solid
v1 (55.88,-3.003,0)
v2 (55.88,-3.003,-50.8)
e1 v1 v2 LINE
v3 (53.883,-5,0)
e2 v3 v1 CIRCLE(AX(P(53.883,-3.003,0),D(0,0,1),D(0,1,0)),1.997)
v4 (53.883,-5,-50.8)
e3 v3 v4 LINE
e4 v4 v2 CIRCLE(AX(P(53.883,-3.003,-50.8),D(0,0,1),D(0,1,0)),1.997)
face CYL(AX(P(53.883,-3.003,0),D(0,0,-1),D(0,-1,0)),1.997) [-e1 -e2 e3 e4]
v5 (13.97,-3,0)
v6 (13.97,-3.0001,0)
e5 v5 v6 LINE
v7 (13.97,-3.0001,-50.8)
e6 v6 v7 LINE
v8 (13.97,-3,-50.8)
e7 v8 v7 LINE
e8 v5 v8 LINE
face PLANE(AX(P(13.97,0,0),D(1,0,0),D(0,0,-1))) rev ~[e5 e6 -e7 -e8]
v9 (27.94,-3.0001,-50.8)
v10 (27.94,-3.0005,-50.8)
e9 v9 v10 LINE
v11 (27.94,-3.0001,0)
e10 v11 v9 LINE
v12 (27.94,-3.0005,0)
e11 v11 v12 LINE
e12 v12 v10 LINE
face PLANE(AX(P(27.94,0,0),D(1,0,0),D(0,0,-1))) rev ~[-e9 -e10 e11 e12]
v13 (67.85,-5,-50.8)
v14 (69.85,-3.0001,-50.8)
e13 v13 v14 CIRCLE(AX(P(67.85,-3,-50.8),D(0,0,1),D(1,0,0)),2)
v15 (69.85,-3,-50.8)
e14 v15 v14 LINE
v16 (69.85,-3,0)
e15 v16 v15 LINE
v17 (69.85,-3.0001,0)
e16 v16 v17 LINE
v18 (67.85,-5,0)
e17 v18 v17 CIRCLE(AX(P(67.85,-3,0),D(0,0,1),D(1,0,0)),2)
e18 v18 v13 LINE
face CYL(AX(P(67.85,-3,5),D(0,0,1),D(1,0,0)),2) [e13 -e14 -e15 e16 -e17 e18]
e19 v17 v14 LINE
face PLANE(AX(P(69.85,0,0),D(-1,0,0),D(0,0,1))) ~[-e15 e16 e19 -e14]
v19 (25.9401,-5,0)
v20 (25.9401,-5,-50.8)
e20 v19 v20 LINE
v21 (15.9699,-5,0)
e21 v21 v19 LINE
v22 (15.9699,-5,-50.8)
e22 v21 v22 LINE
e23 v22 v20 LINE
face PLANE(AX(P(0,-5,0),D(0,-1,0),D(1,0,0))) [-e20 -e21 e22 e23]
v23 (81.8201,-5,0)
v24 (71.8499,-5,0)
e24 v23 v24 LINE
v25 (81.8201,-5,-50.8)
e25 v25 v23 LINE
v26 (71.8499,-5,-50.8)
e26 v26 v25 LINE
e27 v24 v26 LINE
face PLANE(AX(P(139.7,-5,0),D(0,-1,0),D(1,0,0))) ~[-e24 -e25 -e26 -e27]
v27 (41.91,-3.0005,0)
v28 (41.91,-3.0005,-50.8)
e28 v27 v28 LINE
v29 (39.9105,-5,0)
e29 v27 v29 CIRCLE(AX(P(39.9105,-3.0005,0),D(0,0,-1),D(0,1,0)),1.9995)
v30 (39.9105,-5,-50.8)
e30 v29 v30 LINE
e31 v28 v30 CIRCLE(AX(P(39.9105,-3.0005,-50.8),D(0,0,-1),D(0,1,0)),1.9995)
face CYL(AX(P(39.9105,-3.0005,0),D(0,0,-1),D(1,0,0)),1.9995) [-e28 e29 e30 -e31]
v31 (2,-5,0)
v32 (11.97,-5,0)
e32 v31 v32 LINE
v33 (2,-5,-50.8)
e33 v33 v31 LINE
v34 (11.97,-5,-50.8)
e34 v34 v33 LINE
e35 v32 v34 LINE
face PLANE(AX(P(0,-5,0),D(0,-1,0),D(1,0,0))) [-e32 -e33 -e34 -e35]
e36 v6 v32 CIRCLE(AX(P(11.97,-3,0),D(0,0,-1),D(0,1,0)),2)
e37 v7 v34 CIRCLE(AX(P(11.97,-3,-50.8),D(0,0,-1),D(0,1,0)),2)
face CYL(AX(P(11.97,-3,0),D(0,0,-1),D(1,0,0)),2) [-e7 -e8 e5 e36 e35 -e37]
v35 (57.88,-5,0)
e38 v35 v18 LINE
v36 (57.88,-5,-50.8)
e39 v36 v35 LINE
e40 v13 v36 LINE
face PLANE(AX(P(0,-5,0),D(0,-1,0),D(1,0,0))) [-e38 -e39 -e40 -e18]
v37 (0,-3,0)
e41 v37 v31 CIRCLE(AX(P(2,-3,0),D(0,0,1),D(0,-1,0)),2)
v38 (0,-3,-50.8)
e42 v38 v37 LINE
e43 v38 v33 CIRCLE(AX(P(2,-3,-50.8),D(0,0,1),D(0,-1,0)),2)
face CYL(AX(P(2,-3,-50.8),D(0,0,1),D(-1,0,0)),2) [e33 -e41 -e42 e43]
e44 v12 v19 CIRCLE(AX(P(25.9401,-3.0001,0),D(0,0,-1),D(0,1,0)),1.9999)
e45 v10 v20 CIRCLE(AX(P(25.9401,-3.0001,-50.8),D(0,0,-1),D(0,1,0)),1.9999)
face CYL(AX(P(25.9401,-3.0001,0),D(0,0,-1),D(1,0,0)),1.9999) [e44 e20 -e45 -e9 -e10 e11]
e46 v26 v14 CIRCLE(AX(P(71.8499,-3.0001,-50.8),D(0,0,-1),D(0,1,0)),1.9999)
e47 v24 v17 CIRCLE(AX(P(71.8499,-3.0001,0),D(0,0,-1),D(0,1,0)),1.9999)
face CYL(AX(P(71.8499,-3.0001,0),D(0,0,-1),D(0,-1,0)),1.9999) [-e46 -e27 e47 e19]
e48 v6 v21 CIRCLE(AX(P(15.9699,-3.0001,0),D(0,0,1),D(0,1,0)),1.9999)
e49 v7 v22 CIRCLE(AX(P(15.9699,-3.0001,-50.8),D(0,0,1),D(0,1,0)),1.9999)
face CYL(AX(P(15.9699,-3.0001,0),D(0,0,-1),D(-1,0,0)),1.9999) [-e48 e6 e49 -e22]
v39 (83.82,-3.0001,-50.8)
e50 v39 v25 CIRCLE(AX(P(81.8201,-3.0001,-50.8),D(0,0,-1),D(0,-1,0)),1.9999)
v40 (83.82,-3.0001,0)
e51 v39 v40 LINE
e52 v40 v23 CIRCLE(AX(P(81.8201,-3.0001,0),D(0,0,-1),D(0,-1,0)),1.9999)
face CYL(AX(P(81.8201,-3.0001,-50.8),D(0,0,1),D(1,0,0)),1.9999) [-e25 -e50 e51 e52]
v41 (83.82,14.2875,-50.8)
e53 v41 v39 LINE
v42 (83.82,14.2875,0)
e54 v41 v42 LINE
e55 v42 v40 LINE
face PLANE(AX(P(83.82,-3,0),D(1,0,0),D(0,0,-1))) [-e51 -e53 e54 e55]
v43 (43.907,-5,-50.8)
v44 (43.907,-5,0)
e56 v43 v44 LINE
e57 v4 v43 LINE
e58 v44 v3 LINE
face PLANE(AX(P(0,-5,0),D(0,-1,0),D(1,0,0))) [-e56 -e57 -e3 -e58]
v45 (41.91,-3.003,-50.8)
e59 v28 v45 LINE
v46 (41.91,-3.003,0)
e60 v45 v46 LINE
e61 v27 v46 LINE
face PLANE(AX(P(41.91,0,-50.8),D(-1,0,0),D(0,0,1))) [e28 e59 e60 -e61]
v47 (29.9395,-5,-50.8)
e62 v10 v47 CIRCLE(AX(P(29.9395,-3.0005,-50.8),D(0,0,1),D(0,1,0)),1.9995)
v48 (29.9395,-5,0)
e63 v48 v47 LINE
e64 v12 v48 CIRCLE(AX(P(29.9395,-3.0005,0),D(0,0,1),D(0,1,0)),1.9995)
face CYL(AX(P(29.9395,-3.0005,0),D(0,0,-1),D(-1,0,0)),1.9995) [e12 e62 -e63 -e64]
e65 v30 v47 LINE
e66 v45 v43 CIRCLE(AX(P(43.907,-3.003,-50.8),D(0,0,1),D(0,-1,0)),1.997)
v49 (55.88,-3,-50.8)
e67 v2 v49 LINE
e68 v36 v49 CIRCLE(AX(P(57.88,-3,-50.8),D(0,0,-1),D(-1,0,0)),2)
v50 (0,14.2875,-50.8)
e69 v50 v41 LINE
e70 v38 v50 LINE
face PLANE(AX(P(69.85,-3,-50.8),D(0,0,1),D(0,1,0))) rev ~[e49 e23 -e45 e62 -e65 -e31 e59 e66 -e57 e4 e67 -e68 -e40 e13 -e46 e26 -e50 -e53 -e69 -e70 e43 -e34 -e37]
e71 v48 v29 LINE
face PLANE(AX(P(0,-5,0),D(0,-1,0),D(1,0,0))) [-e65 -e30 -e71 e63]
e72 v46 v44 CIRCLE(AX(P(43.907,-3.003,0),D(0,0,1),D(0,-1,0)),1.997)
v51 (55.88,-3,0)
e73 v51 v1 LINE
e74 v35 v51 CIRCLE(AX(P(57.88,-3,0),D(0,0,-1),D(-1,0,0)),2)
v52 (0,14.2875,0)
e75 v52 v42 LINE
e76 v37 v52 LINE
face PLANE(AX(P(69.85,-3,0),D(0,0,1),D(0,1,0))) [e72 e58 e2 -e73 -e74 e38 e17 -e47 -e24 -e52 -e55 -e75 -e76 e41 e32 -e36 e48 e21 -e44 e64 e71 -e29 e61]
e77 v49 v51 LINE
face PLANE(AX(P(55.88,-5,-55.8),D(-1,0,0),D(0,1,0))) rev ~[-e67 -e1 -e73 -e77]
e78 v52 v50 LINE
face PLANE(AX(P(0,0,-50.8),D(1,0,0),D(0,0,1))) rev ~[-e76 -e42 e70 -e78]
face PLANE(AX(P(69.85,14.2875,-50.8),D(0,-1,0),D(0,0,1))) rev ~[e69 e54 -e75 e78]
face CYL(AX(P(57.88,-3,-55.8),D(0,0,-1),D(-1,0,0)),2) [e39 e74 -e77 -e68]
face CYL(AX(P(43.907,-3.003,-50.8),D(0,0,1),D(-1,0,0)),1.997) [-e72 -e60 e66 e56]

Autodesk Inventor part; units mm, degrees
ref_plane "YZ Plane" through (0, 0, 0) normal (1, 0, 0) x (0, 1, 0)
ref_plane "XZ Plane" through (0, 0, 0) normal (0, 1, 0) x (-1, 0, 0)
ref_plane "XY Plane" through (0, 0, 0) normal (0, 0, 1) x (1, 0, 0)
sketch "Sketch1" plane through (0, 0, 0) normal (0, 1, 0) x (-1, 0, 0)
  line L0 (0, 0) -> (-69.85, 0)
  line L1 (-69.85, 0) -> (-69.85, -50.8)
  line L2 (-69.85, -50.8) -> (0, -50.8)
  line L3 (0, -50.8) -> (0, 0)
  dimension "d0" = 50.8
  dimension "d1" = 69.85
extrude "Extrusion1" add sketch "Sketch1" along normal blind 28.575
sketch "Sketch2" plane through (0, 28.575, 0) normal (0, 1, 0) x (1, 0, 0)
  line L0 (0, 0) -> (69.85, 0) projected
  line L1 (13.97, 0) -> (13.97, 50.8)
  line L2 (69.85, 50.8) -> (0, 50.8) projected
  line L3 (27.94, 50.8) -> (27.94, 0)
  line L4 (55.88, 50.8) -> (55.88, 0)
  line L5 (41.91, 50.8) -> (41.91, 0)
  line L6 (0, 50.8) -> (0, 0) projected
  dimension "d4" = 13.97
  dimension "d5" = 13.97
  dimension "d6" = 13.97
  dimension "d7" = 13.97
sketch "Sketch3" plane through (0, 28.575, 0) normal (0, 1, 0) x (1, 0, 0)
  line L0 (69.85, 50.8) -> (0, 50.8) projected
  line L1 (0, 0) -> (69.85, 0) projected
  line L2 (0, 50.8) -> (13.97, 50.8)
  line L3 (13.97, 50.8) -> (13.97, 0)
  line L4 (13.97, 0) -> (0, 0)
  line L5 (0, 0) -> (0, 50.8)
  dimension "d8" = 50.8
  dimension "d9" = 13.97
extrude "Extrusion2" add sketch "Sketch2" along normal blind 5 contours L6 L2 L1 L0
sketch "Sketch4" plane through (0, 0, -50.8) normal (-1, 0, 0) x (0, 0, 1)
  line L0 (0, 0) -> (0, 33.575) projected
  line L1 (50.8, 0) -> (50.8, 33.575) projected
  line L2 (0, 33.575) -> (50.8, 33.575)
  line L3 (50.8, 33.575) -> (50.8, 28.5663)
  line L4 (50.8, 28.5663) -> (0, 28.5663)
  line L5 (0, 28.5663) -> (0, 33.575)
fillet "Fillet1" radius 2 2 edges at (0, 33.575, -25.4) (13.97, 33.575, -25.4)
sketch "Sketch5" plane through (0, 28.575, 0) normal (0, 1, 0) x (1, 0, 0)
  line L0 (13.97, 50.8) -> (27.94, 50.8)
  line L1 (27.94, 50.8) -> (27.94, 0)
  line L2 (27.94, 0) -> (13.97, 0)
  line L3 (13.97, 0) -> (13.97, 50.8)
  point P0 (0, 0)
  dimension "d13" = 13.97
extrude "Extrusion3" add sketch "Sketch5" along normal blind 5
fillet "Fillet2" radius 2 2 edges at (13.97, 33.575, -25.4) (27.94, 33.575, -25.4)
sketch "Sketch6" plane through (0, 28.575, 0) normal (0, 1, 0) x (1, 0, 0)
  line L0 (27.94, 50.8) -> (27.94, 0) projected
  line L1 (27.94, 50.8) -> (41.91, 50.8)
  line L2 (41.91, 50.8) -> (41.91, 0)
  line L3 (41.91, 0) -> (27.94, 0)
  line L4 (27.94, 0) -> (27.94, 50.8)
  point P0 (0, 0)
  dimension "d17" = 13.97
extrude "Extrusion4" add sketch "Sketch6" along normal blind 5
fillet "Fillet3" radius 2 2 edges at (27.94, 33.575, -25.4) (41.91, 33.575, -25.4)
sketch "Sketch7" plane through (0, 28.575, 0) normal (0, 1, 0) x (1, 0, 0)
  line L0 (41.91, 0) -> (41.91, 50.8) projected
  line L1 (41.91, 0) -> (69.85, 0) projected
  line L2 (41.91, 50.8) -> (55.88, 50.8)
  line L3 (55.88, 50.8) -> (55.88, 0)
  line L4 (55.88, 0) -> (41.91, 0)
  line L5 (41.91, 0) -> (41.91, 50.8)
  point P0 (0, 0)
extrude "Extrusion5" add sketch "Sketch7" along normal blind 5
fillet "Fillet4" radius 2 2 edges at (41.91, 33.575, -25.4) (55.88, 33.575, -25.4)
sketch "Sketch8" plane through (0, 28.575, 0) normal (0, 1, 0) x (1, 0, 0)
  line L0 (55.88, 50.8) -> (55.88, 0) projected
  line L1 (55.88, 0) -> (69.85, 0) projected
  line L2 (55.88, 50.8) -> (69.85, 50.8)
  line L3 (69.85, 50.8) -> (69.85, 0)
  line L4 (69.85, 0) -> (55.88, 0)
  line L5 (55.88, 0) -> (55.88, 50.8)
  point P0 (0, 0)
extrude "Extrusion6" add sketch "Sketch8" along normal blind 5
fillet "Fillet5" radius 2 2 edges at (55.88, 33.575, -25.4) (69.85, 33.575, -25.4)
sketch "Sketch9" plane through (0, 0, 0) normal (0, -1, 0) x (1, 0, 0)
  point P0 (0, 0)
sketch "Sketch10" plane through (0, 0, 0) normal (0, -1, 0) x (1, 0, 0)
  line L0 (69.85, -50.8) -> (0, -50.8) projected
  line L1 (0, 0) -> (13.97, 0)
  line L2 (13.97, 0) -> (13.97, -50.8)
  line L3 (13.97, -50.8) -> (0, -50.8)
  line L4 (0, -50.8) -> (0, 0)
  dimension "d27" = 13.97
extrude "Extrusion7" add sketch "Sketch10" along normal blind 5
fillet "Fillet6" radius 2 2 edges at (0, -5, -25.4) (13.97, -5, -25.4)
sketch "Sketch11" plane through (0, 0, 0) normal (0, -1, 0) x (1, 0, 0)
  line L0 (13.97, 0) -> (13.97, -50.8) projected
  line L1 (27.94, -50.8) -> (25.94, -50.8) projected
  line L2 (13.97, 0) -> (27.94, 0)
  line L3 (27.94, 0) -> (27.94, -50.8)
  line L4 (27.94, -50.8) -> (13.97, -50.8)
  line L5 (13.97, -50.8) -> (13.97, 0)
  point P0 (0, 0)
extrude "Extrusion8" add sketch "Sketch11" along normal blind 5
fillet "Fillet7" radius 2 2 edges at (13.97, -5, -25.4) (27.94, -5, -25.4)
sketch "Sketch12" plane through (0, 0, 0) normal (0, -1, 0) x (1, 0, 0)
  line L0 (27.94, 0) -> (27.94, -50.8) projected
  line L1 (41.91, 0) -> (41.91, -50.8) projected
  line L2 (27.94, 0) -> (41.91, 0)
  line L3 (41.91, 0) -> (41.91, -50.8)
  line L4 (41.91, -50.8) -> (27.94, -50.8)
  line L5 (27.94, -50.8) -> (27.94, 0)
  point P0 (0, 0)
extrude "Extrusion9" add sketch "Sketch12" along normal blind 5
fillet "Fillet8" radius 2 2 edges at (27.94, -5, -25.4) (41.91, -5, -25.4)
sketch "Sketch13" plane through (0, 0, 0) normal (0, -1, 0) x (1, 0, 0)
  line L0 (41.91, -50.8) -> (41.91, 0) projected
  line L1 (69.85, -50.8) -> (41.91, -50.8) projected
  line L2 (41.91, 0) -> (55.88, 0)
  line L3 (55.88, 0) -> (55.88, -50.8)
  line L4 (55.88, -50.8) -> (41.91, -50.8)
  line L5 (41.91, -50.8) -> (41.91, 0)
  point P0 (0, 0)
extrude "Extrusion10" add sketch "Sketch13" along normal blind 5
fillet "Fillet9" radius 2 2 edges at (55.88, -5, -25.4) (41.91, -5, -25.4)
sketch "Sketch14" plane through (0, 0, 0) normal (0, -1, 0) x (1, 0, 0)
  line L0 (53.88, 0) -> (55.88, 0) projected
  line L1 (69.85, -50.8) -> (55.88, -50.8) projected
  line L2 (55.88, 0) -> (69.85, 0)
  line L3 (69.85, 0) -> (69.85, -50.8)
  line L4 (69.85, -50.8) -> (55.88, -50.8)
  line L5 (55.88, -50.8) -> (55.88, 0)
  point P0 (0, 0)
extrude "Extrusion11" add sketch "Sketch14" along normal blind 5
fillet "Fillet10" radius 2 2 edges at (55.88, -5, -25.4) (69.85, -5, -25.4)
sketch "Sketch15" plane through (2, 33.575, 0) normal (0, 0, 1) x (1, 0, 0)
  line L0 (-2, -2) -> (-2, -36.575) projected
  line L1 (-2, -19.2875) -> (67.85, -19.2875)
  line L2 (67.85, -36.575) -> (67.85, -2) projected
  line L3 (-2, -19.2875) -> (-2, 10.3755)
  line L4 (-2, 10.3755) -> (71.5202, 10.3755)
  line L5 (71.5202, 10.3755) -> (67.85, -19.2875)
  point P0 (-2, -33.575)
extrude "Extrusion12" cut sketch "Sketch15" against normal through all
sketch "Sketch16" plane through (69.85, -3, 0) normal (1, 0, 0) x (0, 0, -1)
  line L0 (50.8, 17.2875) -> (0, 17.2875) projected
  line L1 (0, 0) -> (0, 17.2875) projected
  line L2 (50.8, 0) -> (0, 0) projected
  line L3 (50.8, 0) -> (50.8, 17.2875) projected
  point P0 (0, 3)
extrude "Extrusion13" add sketch "Sketch16" along normal blind 13.97
ref_plane "Work Plane1" through (69.85, -3, 0) normal (1, 0, 0) x (0, 0, -1)
mirror "Mirror1" about plane through (69.85, -3, 0) normal (1, 0, 0) of "Fillet10", "Extrusion11"
properties part number "Battery"
